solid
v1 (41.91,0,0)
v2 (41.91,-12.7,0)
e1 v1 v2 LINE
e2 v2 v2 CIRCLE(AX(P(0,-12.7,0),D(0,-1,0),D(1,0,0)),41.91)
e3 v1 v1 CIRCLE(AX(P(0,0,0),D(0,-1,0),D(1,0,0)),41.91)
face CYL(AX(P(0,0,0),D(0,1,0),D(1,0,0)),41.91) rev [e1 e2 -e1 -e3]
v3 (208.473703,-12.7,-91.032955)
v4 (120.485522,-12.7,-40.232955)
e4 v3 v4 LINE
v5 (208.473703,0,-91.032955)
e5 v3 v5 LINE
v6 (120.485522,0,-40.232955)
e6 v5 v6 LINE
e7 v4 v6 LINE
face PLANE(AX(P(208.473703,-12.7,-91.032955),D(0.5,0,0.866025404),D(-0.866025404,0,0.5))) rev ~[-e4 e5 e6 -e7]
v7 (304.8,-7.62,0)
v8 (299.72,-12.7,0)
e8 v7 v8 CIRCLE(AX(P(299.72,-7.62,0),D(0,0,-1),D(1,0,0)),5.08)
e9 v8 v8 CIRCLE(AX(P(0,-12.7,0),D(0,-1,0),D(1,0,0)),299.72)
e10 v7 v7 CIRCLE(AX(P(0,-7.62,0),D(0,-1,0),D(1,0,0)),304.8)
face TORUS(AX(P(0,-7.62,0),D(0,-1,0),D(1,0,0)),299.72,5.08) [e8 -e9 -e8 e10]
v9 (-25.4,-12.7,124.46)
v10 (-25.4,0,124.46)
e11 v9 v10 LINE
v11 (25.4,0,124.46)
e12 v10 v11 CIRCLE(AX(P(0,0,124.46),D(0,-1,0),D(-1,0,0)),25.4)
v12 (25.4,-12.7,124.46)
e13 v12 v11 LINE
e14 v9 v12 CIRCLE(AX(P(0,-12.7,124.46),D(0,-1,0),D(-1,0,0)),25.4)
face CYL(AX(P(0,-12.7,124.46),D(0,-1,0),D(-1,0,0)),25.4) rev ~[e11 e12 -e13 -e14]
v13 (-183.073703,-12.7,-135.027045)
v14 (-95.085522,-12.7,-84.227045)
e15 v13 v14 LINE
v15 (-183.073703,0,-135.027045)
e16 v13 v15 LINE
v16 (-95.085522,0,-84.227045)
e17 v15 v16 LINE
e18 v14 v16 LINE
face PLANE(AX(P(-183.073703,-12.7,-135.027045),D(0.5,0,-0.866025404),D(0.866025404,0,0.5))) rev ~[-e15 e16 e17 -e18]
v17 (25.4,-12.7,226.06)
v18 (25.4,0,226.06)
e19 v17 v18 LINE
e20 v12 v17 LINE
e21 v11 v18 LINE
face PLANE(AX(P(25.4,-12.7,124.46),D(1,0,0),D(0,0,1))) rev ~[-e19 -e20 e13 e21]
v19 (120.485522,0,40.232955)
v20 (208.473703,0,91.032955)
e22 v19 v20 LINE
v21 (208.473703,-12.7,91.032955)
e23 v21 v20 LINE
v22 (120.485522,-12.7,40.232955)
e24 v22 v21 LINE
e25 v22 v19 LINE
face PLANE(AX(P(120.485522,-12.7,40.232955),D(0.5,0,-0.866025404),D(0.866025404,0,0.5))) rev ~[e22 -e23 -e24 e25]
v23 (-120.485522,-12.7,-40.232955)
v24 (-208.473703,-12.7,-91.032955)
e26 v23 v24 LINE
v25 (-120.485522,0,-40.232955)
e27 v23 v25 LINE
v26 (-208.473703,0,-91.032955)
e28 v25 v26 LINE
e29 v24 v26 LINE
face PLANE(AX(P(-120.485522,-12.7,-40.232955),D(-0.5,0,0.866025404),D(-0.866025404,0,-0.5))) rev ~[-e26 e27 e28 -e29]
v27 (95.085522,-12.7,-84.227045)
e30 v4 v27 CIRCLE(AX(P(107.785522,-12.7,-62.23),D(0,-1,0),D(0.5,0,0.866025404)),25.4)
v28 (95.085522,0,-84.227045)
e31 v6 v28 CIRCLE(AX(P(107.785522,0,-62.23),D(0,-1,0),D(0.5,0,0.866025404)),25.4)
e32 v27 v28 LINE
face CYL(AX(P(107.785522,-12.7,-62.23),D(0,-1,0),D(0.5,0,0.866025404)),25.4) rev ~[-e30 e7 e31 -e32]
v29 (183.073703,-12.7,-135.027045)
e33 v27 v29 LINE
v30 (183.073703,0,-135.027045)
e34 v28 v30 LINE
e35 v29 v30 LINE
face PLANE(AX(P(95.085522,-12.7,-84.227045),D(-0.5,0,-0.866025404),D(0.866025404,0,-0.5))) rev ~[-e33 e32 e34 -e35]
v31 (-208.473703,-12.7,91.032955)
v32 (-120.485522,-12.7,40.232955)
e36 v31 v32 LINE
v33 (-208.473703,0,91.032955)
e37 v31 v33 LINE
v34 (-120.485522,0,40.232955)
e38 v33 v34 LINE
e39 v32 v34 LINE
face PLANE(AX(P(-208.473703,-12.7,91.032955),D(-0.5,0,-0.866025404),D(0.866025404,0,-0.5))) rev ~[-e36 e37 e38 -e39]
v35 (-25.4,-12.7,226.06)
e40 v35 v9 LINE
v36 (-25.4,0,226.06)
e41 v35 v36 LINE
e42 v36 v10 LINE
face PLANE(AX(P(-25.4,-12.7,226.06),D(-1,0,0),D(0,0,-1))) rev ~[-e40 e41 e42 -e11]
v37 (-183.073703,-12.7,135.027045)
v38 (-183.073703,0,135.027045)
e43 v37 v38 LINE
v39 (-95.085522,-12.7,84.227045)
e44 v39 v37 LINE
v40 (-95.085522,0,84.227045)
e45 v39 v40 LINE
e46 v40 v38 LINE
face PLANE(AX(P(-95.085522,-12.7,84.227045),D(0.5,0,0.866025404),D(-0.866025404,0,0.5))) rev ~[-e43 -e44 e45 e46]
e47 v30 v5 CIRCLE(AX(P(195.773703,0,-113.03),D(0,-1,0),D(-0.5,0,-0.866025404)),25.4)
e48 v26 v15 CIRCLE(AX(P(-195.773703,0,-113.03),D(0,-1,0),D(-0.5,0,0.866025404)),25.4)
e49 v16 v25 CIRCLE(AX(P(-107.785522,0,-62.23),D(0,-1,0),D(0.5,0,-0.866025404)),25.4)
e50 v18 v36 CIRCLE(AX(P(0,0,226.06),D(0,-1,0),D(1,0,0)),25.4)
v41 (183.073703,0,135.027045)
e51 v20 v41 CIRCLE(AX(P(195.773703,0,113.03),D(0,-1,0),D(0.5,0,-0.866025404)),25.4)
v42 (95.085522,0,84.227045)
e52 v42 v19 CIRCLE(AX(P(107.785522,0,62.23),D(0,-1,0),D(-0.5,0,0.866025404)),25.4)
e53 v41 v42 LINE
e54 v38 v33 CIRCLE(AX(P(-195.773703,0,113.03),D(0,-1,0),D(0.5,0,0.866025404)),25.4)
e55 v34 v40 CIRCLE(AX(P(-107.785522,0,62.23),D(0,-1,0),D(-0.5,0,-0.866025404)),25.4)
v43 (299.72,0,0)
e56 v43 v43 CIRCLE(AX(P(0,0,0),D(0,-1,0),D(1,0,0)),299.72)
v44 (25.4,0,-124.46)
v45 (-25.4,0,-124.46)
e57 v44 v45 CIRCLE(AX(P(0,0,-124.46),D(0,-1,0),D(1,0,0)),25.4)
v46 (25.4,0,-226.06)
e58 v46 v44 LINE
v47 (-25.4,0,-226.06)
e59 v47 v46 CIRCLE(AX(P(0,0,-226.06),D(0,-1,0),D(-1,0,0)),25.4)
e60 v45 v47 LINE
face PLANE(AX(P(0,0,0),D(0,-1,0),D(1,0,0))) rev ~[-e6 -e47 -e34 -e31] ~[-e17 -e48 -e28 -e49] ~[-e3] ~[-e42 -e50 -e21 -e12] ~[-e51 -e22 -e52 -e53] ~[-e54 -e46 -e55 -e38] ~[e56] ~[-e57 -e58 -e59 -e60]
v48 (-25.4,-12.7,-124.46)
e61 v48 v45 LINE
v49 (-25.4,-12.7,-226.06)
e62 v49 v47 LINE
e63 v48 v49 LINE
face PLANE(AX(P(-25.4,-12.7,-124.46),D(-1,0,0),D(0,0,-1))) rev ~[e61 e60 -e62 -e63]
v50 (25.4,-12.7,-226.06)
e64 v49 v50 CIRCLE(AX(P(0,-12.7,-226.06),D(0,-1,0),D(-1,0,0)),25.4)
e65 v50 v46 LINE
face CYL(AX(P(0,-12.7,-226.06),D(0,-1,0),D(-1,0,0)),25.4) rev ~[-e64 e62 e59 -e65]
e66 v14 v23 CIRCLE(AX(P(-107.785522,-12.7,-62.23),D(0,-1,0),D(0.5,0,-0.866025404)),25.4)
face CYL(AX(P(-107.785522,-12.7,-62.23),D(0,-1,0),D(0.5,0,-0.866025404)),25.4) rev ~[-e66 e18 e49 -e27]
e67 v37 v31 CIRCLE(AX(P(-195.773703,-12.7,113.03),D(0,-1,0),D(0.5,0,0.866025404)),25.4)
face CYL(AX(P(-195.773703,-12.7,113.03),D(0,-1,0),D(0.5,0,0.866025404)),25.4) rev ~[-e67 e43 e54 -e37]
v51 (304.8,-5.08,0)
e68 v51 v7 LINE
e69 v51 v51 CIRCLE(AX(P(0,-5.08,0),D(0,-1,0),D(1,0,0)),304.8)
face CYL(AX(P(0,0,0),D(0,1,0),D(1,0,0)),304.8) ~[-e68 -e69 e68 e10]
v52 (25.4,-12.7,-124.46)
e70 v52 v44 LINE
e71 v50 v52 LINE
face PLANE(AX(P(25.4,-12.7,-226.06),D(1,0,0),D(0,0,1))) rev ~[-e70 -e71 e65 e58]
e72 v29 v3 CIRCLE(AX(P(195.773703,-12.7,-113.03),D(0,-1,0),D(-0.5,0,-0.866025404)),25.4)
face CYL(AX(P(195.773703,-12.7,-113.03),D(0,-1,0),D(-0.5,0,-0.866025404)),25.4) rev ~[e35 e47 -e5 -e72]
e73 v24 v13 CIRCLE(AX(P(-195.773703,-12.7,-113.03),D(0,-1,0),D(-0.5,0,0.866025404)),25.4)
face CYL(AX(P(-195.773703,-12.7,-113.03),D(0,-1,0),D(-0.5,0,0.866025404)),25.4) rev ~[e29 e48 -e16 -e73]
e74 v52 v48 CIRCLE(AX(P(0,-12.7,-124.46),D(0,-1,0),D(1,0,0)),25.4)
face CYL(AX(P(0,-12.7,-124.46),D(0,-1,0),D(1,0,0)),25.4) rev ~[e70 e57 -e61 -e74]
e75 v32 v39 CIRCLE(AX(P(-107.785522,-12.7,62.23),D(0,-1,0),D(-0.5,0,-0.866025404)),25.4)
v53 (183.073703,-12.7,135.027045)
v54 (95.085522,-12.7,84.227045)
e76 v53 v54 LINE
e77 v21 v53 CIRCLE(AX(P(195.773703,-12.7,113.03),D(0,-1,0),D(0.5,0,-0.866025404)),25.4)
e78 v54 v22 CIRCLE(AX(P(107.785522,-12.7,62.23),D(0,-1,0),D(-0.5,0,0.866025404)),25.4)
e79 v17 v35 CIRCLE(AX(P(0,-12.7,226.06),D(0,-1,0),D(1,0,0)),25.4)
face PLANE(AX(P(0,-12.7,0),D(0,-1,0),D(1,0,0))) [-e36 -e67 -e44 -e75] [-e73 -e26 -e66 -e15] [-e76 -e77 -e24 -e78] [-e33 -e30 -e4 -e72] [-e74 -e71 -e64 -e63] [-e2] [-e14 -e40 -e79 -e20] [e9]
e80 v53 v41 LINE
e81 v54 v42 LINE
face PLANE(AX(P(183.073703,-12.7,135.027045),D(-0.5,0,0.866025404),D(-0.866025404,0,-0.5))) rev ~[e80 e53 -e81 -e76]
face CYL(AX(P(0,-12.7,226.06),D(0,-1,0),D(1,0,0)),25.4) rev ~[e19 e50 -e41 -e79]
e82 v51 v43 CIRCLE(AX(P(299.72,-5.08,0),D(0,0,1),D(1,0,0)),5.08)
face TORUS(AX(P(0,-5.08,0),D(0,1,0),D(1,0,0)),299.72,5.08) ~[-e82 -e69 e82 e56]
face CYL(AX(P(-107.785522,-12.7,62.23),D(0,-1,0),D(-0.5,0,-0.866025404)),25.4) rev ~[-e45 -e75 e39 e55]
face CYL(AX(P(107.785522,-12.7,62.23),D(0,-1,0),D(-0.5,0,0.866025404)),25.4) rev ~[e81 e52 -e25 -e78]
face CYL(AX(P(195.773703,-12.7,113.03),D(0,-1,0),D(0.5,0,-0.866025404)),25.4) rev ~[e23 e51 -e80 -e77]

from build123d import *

# Parameters (mm, degrees)
F0_R     = 304.8
F0_R_2   = 41.91
F1_DEPTH = 12.7
F3_DEPTH = 12.701
F4_R     = 5.08


# Not quite as in the source:
# - a feature names something its author has since deleted; it is built from what else it names


with BuildPart() as f1:
    # F0 (on Front) → F1 (new body)
    with BuildSketch(Plane.XZ):
        Circle(F0_R)
        Circle(F0_R_2, mode=Mode.SUBTRACT)
    extrude(amount=F1_DEPTH)

    # F2 (on face) → F3 (cut, through all)
    with BuildSketch(Plane.XZ.offset(12.7)):
        with BuildLine():
            Line((-25.4, 226.06), (-25.4, 124.46))
            ThreePointArc((-25.4, 124.46), (0, 99.06), (25.4, 124.46))
            Line((25.4, 124.46), (25.4, 226.06))
            ThreePointArc((25.4, 226.06), (0, 251.46), (-25.4, 226.06))
        make_face()
        with BuildLine():
            Line((-183.0737027795, -135.0270452561), (-95.085521755, -84.2270452561))
            ThreePointArc((-95.085521755, -84.2270452561), (-85.7884764989, -49.53), (-120.485521755, -40.2329547439))
            Line((-120.485521755, -40.2329547439), (-208.4737027795, -91.0329547439))
            ThreePointArc((-208.4737027795, -91.0329547439), (-217.7707480356, -125.73), (-183.0737027795, -135.0270452561))
        make_face()
        with BuildLine():
            Line((-208.4737027795, 91.0329547439), (-120.485521755, 40.2329547439))
            ThreePointArc((-120.485521755, 40.2329547439), (-85.7884764989, 49.53), (-95.085521755, 84.2270452561))
            Line((-95.085521755, 84.2270452561), (-183.0737027795, 135.0270452561))
            ThreePointArc((-183.0737027795, 135.0270452561), (-217.7707480356, 125.73), (-208.4737027795, 91.0329547439))
        make_face()
        with BuildLine():
            Line((183.0737027795, 135.0270452561), (95.085521755, 84.2270452561))
            ThreePointArc((95.085521755, 84.2270452561), (85.7884764989, 49.53), (120.485521755, 40.2329547439))
            Line((120.485521755, 40.2329547439), (208.4737027795, 91.0329547439))
            ThreePointArc((208.4737027795, 91.0329547439), (217.7707480356, 125.73), (183.0737027795, 135.0270452561))
        make_face()
        with BuildLine():
            Line((208.4737027795, -91.0329547439), (120.485521755, -40.2329547439))
            ThreePointArc((120.485521755, -40.2329547439), (85.7884764989, -49.53), (95.085521755, -84.2270452561))
            Line((95.085521755, -84.2270452561), (183.0737027795, -135.0270452561))
            ThreePointArc((183.0737027795, -135.0270452561), (217.7707480356, -125.73), (208.4737027795, -91.0329547439))
        make_face()
        with BuildLine():
            Line((25.4, -226.06), (25.4, -124.46))
            ThreePointArc((25.4, -124.46), (0, -99.06), (-25.4, -124.46))
            Line((-25.4, -124.46), (-25.4, -226.06))
            ThreePointArc((-25.4, -226.06), (0, -251.46), (25.4, -226.06))
        make_face()
    extrude(amount=-F3_DEPTH, mode=Mode.SUBTRACT)

    # F4
    f4_edges = [f1.edges().sort_by_distance(p)[0] for p in [
        (-304.8, 0, 0),
        (-304.8, -12.7, 0),
    ]]
    fillet(f4_edges, radius=F4_R)


solid = f1.part
